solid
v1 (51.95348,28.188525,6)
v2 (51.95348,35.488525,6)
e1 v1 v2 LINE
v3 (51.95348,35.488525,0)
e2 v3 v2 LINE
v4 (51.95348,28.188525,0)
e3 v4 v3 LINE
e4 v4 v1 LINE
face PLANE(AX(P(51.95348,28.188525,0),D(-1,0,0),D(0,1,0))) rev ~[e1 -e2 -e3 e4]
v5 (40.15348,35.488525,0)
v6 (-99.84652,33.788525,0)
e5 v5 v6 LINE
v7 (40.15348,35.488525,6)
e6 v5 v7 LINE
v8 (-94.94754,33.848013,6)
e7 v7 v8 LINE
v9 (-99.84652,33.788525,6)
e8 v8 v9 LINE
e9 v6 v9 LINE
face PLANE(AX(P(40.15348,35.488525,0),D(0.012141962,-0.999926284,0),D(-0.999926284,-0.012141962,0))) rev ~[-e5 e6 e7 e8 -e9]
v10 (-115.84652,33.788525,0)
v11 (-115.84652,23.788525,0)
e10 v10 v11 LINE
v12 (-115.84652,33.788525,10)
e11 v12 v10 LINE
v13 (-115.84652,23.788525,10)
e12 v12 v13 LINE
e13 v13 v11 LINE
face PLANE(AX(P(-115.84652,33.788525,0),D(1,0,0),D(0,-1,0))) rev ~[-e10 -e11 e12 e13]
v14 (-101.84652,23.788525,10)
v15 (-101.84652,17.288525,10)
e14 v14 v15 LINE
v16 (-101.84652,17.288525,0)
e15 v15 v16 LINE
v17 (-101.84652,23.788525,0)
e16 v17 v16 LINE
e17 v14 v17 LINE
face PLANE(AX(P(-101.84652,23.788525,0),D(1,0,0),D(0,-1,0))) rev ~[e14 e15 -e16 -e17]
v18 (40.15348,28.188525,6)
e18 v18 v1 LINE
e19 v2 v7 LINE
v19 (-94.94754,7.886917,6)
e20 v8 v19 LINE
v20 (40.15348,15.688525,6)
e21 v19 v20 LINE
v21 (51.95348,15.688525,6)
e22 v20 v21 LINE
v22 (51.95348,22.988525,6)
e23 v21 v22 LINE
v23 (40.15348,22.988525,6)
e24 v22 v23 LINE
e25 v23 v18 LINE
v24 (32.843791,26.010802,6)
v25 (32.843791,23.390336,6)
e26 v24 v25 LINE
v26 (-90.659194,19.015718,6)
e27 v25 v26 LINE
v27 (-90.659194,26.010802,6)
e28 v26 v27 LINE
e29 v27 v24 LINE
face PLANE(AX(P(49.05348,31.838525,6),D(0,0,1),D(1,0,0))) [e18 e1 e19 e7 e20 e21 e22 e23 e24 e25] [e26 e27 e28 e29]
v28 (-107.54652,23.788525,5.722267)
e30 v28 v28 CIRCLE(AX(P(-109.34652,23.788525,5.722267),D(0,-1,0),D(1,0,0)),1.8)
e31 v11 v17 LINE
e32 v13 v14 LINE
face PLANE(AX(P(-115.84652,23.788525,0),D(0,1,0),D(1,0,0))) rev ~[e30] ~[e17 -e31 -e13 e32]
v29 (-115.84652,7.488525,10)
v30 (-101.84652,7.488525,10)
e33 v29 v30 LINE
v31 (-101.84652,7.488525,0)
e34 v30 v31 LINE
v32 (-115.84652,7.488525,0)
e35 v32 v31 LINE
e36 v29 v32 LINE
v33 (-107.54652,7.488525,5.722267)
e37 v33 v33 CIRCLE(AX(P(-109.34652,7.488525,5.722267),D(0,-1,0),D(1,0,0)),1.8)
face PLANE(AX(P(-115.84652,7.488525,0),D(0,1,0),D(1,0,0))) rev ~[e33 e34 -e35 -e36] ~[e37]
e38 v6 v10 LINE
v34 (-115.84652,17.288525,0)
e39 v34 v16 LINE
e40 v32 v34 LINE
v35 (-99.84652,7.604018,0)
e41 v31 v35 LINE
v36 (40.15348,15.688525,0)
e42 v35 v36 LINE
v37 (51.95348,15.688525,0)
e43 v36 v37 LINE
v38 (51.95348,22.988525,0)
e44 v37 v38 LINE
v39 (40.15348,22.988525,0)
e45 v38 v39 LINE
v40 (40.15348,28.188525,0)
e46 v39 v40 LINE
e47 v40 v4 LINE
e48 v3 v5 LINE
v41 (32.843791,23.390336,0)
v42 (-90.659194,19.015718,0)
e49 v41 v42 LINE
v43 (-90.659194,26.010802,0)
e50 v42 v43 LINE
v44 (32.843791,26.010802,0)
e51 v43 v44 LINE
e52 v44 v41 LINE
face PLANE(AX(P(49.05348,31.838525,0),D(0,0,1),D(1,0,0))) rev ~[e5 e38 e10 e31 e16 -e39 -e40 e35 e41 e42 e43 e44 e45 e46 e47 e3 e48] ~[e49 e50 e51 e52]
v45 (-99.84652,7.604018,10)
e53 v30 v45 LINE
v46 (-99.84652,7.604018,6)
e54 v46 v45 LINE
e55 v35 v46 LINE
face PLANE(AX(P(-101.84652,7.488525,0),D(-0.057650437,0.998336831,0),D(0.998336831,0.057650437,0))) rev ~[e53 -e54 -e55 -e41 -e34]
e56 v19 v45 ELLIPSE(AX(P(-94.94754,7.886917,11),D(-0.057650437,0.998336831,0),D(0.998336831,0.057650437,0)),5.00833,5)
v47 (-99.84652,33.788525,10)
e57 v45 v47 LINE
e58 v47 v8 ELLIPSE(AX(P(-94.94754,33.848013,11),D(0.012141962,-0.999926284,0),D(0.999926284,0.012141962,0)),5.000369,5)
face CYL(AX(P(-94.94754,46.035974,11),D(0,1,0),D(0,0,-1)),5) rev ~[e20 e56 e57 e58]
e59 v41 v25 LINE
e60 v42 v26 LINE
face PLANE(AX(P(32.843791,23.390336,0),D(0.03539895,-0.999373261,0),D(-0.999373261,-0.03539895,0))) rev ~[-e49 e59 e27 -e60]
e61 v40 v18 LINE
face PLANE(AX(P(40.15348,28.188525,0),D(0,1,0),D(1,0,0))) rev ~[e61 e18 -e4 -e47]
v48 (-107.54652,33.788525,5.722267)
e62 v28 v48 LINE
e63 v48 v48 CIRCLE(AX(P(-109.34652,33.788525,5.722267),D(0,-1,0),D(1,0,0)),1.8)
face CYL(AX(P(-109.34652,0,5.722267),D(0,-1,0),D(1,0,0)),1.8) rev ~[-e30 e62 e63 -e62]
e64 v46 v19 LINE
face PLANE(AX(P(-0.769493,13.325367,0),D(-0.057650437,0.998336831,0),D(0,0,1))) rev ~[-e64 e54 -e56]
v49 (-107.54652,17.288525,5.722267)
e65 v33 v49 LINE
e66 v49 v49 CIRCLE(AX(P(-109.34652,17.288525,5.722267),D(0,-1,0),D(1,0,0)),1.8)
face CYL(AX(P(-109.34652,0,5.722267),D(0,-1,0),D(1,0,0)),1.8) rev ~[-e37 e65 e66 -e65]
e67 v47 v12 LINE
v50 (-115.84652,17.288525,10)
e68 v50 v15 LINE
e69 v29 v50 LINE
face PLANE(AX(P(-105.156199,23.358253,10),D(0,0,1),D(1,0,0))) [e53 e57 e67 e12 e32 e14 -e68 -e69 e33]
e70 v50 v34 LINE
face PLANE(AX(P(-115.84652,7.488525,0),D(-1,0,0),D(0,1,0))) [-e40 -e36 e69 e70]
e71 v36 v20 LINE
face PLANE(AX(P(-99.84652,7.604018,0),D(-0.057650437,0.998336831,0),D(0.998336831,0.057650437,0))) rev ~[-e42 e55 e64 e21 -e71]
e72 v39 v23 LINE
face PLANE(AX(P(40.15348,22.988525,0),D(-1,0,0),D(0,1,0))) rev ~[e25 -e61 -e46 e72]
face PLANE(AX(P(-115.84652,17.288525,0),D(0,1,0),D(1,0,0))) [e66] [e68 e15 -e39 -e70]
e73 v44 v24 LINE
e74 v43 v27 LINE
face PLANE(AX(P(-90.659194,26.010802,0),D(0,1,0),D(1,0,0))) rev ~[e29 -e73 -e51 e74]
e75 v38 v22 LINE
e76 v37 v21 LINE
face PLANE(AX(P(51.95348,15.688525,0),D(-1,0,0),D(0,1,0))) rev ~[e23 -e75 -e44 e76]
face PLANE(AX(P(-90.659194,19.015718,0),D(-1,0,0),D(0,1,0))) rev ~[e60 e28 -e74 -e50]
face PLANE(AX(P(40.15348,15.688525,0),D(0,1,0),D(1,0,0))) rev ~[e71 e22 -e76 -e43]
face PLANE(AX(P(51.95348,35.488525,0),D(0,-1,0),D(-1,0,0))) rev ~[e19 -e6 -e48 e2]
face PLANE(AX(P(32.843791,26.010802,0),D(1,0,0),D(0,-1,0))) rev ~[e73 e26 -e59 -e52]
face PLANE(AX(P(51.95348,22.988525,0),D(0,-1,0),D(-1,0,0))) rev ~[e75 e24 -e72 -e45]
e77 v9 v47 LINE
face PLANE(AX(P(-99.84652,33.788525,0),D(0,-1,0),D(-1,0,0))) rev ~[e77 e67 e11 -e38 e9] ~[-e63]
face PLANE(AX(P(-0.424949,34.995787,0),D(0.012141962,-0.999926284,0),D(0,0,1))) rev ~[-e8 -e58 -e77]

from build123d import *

# Parameters (mm, degrees)
F0_W        = 5.8
F0_H        = 7.3
F0_W_2      = 14
F0_H_2      = 9.8
F0_W_3      = 6
F1_DEPTH    = 6
F2_DEPTH    = 10
F3_R        = 1.8
F4_DEPTH    = 46
F5_T4_DEPTH = 50.6794044701


# Not quite as in the source:
# - a fillet or chamfer that OpenCascade refuses, or shapes differently, is made with other operations: its cross-section is extruded or revolved along the edge and cut away or added


with BuildPart() as f1:
    # F0 (on Top) → F1 (new body)
    with BuildSketch(Plane.XY):
        with Locations((49.0534804702, 31.8385251075)):
            Rectangle(F0_W, F0_H)
        with Locations((49.0534804702, 19.3385251075)):
            Rectangle(F0_W, F0_H)
        with Locations((-108.8465195298, 12.3885251075)):
            Rectangle(F0_W_2, F0_H_2)
        with Locations((43.1534804702, 31.8385251075)):
            Rectangle(F0_W_3, F0_H)
        with Locations((43.1534804702, 19.3385251075)):
            Rectangle(F0_W_3, F0_H)
        Polygon((-99.8465195298, 7.6040180652), (-99.8465195298, 33.7885251075), (-115.8465195298, 33.7885251075), (-115.8465195298, 31.2885251075), (-115.8465195298, 23.7885251075), (-101.8465195298, 23.7885251075), (-101.8465195298, 17.2885251075), (-101.8465195298, 7.4885251075), align=None)
        Polygon((40.1534804702, 28.1885251075), (40.1534804702, 35.4885251075), (-99.8465195298, 33.7885251075), (-99.8465195298, 7.6040180652), (40.1534804702, 15.6885251075), (40.1534804702, 22.9885251075), align=None)
        Polygon((-90.6591936946, 19.0157179874), (-90.6591936946, 26.0108020157), (32.8437909484, 26.0108020157), (32.8437909484, 23.3903356981), align=None, mode=Mode.SUBTRACT)
    extrude(amount=F1_DEPTH)

    # F0 (on Top) → F2 (join)
    with BuildSketch(Plane.XY):
        Polygon((-99.8465195298, 7.6040180652), (-99.8465195298, 33.7885251075), (-115.8465195298, 33.7885251075), (-115.8465195298, 31.2885251075), (-115.8465195298, 23.7885251075), (-101.8465195298, 23.7885251075), (-101.8465195298, 17.2885251075), (-101.8465195298, 7.4885251075), align=None)
        with Locations((-108.8465195298, 12.3885251075)):
            Rectangle(F0_W_2, F0_H_2)
    extrude(amount=F2_DEPTH)

    # F3 (on Front) → F4 (cut)
    with BuildSketch(Plane.XZ):
        with Locations((-109.3465195298, 5.7222666219)):
            Circle(F3_R)
    extrude(amount=-F4_DEPTH, mode=Mode.SUBTRACT)

    # F5: fillet of radius 5 on 1 edges, made by hand


with BuildPart() as f5_tool2:
    # F5_s3 → F5_t4 (new body)
    with BuildSketch(Plane.XZ.offset(-46.0359738214)):
        with BuildLine():
            ThreePointArc((-94.9475400442, 6), (-98.1098177044, 7.1270166538), (-99.8465195298, 10))
            Line((-99.8465195298, 10), (-99.8465195298, 6))
            Line((-99.8465195298, 6), (-94.9475400442, 6))
        make_face()
    extrude(amount=F5_T4_DEPTH)

    split(bisect_by=Plane(origin=(-0.4249488426, 34.9957870373, 0), x_dir=(0, 0, 1), z_dir=(0.012141962, -0.9999262837, 0)), keep=Keep.TOP)

    split(bisect_by=Plane(origin=(-0.7694930518, 13.3253674816, 0), x_dir=(0, 0, 1), z_dir=(-0.0576504367, 0.9983368305, 0)), keep=Keep.TOP)


with BuildPart() as f1_1:
    add(f1.part)

    # F5_t1: union F5_tool2
    add(f5_tool2.part)


solid = f1_1.part
